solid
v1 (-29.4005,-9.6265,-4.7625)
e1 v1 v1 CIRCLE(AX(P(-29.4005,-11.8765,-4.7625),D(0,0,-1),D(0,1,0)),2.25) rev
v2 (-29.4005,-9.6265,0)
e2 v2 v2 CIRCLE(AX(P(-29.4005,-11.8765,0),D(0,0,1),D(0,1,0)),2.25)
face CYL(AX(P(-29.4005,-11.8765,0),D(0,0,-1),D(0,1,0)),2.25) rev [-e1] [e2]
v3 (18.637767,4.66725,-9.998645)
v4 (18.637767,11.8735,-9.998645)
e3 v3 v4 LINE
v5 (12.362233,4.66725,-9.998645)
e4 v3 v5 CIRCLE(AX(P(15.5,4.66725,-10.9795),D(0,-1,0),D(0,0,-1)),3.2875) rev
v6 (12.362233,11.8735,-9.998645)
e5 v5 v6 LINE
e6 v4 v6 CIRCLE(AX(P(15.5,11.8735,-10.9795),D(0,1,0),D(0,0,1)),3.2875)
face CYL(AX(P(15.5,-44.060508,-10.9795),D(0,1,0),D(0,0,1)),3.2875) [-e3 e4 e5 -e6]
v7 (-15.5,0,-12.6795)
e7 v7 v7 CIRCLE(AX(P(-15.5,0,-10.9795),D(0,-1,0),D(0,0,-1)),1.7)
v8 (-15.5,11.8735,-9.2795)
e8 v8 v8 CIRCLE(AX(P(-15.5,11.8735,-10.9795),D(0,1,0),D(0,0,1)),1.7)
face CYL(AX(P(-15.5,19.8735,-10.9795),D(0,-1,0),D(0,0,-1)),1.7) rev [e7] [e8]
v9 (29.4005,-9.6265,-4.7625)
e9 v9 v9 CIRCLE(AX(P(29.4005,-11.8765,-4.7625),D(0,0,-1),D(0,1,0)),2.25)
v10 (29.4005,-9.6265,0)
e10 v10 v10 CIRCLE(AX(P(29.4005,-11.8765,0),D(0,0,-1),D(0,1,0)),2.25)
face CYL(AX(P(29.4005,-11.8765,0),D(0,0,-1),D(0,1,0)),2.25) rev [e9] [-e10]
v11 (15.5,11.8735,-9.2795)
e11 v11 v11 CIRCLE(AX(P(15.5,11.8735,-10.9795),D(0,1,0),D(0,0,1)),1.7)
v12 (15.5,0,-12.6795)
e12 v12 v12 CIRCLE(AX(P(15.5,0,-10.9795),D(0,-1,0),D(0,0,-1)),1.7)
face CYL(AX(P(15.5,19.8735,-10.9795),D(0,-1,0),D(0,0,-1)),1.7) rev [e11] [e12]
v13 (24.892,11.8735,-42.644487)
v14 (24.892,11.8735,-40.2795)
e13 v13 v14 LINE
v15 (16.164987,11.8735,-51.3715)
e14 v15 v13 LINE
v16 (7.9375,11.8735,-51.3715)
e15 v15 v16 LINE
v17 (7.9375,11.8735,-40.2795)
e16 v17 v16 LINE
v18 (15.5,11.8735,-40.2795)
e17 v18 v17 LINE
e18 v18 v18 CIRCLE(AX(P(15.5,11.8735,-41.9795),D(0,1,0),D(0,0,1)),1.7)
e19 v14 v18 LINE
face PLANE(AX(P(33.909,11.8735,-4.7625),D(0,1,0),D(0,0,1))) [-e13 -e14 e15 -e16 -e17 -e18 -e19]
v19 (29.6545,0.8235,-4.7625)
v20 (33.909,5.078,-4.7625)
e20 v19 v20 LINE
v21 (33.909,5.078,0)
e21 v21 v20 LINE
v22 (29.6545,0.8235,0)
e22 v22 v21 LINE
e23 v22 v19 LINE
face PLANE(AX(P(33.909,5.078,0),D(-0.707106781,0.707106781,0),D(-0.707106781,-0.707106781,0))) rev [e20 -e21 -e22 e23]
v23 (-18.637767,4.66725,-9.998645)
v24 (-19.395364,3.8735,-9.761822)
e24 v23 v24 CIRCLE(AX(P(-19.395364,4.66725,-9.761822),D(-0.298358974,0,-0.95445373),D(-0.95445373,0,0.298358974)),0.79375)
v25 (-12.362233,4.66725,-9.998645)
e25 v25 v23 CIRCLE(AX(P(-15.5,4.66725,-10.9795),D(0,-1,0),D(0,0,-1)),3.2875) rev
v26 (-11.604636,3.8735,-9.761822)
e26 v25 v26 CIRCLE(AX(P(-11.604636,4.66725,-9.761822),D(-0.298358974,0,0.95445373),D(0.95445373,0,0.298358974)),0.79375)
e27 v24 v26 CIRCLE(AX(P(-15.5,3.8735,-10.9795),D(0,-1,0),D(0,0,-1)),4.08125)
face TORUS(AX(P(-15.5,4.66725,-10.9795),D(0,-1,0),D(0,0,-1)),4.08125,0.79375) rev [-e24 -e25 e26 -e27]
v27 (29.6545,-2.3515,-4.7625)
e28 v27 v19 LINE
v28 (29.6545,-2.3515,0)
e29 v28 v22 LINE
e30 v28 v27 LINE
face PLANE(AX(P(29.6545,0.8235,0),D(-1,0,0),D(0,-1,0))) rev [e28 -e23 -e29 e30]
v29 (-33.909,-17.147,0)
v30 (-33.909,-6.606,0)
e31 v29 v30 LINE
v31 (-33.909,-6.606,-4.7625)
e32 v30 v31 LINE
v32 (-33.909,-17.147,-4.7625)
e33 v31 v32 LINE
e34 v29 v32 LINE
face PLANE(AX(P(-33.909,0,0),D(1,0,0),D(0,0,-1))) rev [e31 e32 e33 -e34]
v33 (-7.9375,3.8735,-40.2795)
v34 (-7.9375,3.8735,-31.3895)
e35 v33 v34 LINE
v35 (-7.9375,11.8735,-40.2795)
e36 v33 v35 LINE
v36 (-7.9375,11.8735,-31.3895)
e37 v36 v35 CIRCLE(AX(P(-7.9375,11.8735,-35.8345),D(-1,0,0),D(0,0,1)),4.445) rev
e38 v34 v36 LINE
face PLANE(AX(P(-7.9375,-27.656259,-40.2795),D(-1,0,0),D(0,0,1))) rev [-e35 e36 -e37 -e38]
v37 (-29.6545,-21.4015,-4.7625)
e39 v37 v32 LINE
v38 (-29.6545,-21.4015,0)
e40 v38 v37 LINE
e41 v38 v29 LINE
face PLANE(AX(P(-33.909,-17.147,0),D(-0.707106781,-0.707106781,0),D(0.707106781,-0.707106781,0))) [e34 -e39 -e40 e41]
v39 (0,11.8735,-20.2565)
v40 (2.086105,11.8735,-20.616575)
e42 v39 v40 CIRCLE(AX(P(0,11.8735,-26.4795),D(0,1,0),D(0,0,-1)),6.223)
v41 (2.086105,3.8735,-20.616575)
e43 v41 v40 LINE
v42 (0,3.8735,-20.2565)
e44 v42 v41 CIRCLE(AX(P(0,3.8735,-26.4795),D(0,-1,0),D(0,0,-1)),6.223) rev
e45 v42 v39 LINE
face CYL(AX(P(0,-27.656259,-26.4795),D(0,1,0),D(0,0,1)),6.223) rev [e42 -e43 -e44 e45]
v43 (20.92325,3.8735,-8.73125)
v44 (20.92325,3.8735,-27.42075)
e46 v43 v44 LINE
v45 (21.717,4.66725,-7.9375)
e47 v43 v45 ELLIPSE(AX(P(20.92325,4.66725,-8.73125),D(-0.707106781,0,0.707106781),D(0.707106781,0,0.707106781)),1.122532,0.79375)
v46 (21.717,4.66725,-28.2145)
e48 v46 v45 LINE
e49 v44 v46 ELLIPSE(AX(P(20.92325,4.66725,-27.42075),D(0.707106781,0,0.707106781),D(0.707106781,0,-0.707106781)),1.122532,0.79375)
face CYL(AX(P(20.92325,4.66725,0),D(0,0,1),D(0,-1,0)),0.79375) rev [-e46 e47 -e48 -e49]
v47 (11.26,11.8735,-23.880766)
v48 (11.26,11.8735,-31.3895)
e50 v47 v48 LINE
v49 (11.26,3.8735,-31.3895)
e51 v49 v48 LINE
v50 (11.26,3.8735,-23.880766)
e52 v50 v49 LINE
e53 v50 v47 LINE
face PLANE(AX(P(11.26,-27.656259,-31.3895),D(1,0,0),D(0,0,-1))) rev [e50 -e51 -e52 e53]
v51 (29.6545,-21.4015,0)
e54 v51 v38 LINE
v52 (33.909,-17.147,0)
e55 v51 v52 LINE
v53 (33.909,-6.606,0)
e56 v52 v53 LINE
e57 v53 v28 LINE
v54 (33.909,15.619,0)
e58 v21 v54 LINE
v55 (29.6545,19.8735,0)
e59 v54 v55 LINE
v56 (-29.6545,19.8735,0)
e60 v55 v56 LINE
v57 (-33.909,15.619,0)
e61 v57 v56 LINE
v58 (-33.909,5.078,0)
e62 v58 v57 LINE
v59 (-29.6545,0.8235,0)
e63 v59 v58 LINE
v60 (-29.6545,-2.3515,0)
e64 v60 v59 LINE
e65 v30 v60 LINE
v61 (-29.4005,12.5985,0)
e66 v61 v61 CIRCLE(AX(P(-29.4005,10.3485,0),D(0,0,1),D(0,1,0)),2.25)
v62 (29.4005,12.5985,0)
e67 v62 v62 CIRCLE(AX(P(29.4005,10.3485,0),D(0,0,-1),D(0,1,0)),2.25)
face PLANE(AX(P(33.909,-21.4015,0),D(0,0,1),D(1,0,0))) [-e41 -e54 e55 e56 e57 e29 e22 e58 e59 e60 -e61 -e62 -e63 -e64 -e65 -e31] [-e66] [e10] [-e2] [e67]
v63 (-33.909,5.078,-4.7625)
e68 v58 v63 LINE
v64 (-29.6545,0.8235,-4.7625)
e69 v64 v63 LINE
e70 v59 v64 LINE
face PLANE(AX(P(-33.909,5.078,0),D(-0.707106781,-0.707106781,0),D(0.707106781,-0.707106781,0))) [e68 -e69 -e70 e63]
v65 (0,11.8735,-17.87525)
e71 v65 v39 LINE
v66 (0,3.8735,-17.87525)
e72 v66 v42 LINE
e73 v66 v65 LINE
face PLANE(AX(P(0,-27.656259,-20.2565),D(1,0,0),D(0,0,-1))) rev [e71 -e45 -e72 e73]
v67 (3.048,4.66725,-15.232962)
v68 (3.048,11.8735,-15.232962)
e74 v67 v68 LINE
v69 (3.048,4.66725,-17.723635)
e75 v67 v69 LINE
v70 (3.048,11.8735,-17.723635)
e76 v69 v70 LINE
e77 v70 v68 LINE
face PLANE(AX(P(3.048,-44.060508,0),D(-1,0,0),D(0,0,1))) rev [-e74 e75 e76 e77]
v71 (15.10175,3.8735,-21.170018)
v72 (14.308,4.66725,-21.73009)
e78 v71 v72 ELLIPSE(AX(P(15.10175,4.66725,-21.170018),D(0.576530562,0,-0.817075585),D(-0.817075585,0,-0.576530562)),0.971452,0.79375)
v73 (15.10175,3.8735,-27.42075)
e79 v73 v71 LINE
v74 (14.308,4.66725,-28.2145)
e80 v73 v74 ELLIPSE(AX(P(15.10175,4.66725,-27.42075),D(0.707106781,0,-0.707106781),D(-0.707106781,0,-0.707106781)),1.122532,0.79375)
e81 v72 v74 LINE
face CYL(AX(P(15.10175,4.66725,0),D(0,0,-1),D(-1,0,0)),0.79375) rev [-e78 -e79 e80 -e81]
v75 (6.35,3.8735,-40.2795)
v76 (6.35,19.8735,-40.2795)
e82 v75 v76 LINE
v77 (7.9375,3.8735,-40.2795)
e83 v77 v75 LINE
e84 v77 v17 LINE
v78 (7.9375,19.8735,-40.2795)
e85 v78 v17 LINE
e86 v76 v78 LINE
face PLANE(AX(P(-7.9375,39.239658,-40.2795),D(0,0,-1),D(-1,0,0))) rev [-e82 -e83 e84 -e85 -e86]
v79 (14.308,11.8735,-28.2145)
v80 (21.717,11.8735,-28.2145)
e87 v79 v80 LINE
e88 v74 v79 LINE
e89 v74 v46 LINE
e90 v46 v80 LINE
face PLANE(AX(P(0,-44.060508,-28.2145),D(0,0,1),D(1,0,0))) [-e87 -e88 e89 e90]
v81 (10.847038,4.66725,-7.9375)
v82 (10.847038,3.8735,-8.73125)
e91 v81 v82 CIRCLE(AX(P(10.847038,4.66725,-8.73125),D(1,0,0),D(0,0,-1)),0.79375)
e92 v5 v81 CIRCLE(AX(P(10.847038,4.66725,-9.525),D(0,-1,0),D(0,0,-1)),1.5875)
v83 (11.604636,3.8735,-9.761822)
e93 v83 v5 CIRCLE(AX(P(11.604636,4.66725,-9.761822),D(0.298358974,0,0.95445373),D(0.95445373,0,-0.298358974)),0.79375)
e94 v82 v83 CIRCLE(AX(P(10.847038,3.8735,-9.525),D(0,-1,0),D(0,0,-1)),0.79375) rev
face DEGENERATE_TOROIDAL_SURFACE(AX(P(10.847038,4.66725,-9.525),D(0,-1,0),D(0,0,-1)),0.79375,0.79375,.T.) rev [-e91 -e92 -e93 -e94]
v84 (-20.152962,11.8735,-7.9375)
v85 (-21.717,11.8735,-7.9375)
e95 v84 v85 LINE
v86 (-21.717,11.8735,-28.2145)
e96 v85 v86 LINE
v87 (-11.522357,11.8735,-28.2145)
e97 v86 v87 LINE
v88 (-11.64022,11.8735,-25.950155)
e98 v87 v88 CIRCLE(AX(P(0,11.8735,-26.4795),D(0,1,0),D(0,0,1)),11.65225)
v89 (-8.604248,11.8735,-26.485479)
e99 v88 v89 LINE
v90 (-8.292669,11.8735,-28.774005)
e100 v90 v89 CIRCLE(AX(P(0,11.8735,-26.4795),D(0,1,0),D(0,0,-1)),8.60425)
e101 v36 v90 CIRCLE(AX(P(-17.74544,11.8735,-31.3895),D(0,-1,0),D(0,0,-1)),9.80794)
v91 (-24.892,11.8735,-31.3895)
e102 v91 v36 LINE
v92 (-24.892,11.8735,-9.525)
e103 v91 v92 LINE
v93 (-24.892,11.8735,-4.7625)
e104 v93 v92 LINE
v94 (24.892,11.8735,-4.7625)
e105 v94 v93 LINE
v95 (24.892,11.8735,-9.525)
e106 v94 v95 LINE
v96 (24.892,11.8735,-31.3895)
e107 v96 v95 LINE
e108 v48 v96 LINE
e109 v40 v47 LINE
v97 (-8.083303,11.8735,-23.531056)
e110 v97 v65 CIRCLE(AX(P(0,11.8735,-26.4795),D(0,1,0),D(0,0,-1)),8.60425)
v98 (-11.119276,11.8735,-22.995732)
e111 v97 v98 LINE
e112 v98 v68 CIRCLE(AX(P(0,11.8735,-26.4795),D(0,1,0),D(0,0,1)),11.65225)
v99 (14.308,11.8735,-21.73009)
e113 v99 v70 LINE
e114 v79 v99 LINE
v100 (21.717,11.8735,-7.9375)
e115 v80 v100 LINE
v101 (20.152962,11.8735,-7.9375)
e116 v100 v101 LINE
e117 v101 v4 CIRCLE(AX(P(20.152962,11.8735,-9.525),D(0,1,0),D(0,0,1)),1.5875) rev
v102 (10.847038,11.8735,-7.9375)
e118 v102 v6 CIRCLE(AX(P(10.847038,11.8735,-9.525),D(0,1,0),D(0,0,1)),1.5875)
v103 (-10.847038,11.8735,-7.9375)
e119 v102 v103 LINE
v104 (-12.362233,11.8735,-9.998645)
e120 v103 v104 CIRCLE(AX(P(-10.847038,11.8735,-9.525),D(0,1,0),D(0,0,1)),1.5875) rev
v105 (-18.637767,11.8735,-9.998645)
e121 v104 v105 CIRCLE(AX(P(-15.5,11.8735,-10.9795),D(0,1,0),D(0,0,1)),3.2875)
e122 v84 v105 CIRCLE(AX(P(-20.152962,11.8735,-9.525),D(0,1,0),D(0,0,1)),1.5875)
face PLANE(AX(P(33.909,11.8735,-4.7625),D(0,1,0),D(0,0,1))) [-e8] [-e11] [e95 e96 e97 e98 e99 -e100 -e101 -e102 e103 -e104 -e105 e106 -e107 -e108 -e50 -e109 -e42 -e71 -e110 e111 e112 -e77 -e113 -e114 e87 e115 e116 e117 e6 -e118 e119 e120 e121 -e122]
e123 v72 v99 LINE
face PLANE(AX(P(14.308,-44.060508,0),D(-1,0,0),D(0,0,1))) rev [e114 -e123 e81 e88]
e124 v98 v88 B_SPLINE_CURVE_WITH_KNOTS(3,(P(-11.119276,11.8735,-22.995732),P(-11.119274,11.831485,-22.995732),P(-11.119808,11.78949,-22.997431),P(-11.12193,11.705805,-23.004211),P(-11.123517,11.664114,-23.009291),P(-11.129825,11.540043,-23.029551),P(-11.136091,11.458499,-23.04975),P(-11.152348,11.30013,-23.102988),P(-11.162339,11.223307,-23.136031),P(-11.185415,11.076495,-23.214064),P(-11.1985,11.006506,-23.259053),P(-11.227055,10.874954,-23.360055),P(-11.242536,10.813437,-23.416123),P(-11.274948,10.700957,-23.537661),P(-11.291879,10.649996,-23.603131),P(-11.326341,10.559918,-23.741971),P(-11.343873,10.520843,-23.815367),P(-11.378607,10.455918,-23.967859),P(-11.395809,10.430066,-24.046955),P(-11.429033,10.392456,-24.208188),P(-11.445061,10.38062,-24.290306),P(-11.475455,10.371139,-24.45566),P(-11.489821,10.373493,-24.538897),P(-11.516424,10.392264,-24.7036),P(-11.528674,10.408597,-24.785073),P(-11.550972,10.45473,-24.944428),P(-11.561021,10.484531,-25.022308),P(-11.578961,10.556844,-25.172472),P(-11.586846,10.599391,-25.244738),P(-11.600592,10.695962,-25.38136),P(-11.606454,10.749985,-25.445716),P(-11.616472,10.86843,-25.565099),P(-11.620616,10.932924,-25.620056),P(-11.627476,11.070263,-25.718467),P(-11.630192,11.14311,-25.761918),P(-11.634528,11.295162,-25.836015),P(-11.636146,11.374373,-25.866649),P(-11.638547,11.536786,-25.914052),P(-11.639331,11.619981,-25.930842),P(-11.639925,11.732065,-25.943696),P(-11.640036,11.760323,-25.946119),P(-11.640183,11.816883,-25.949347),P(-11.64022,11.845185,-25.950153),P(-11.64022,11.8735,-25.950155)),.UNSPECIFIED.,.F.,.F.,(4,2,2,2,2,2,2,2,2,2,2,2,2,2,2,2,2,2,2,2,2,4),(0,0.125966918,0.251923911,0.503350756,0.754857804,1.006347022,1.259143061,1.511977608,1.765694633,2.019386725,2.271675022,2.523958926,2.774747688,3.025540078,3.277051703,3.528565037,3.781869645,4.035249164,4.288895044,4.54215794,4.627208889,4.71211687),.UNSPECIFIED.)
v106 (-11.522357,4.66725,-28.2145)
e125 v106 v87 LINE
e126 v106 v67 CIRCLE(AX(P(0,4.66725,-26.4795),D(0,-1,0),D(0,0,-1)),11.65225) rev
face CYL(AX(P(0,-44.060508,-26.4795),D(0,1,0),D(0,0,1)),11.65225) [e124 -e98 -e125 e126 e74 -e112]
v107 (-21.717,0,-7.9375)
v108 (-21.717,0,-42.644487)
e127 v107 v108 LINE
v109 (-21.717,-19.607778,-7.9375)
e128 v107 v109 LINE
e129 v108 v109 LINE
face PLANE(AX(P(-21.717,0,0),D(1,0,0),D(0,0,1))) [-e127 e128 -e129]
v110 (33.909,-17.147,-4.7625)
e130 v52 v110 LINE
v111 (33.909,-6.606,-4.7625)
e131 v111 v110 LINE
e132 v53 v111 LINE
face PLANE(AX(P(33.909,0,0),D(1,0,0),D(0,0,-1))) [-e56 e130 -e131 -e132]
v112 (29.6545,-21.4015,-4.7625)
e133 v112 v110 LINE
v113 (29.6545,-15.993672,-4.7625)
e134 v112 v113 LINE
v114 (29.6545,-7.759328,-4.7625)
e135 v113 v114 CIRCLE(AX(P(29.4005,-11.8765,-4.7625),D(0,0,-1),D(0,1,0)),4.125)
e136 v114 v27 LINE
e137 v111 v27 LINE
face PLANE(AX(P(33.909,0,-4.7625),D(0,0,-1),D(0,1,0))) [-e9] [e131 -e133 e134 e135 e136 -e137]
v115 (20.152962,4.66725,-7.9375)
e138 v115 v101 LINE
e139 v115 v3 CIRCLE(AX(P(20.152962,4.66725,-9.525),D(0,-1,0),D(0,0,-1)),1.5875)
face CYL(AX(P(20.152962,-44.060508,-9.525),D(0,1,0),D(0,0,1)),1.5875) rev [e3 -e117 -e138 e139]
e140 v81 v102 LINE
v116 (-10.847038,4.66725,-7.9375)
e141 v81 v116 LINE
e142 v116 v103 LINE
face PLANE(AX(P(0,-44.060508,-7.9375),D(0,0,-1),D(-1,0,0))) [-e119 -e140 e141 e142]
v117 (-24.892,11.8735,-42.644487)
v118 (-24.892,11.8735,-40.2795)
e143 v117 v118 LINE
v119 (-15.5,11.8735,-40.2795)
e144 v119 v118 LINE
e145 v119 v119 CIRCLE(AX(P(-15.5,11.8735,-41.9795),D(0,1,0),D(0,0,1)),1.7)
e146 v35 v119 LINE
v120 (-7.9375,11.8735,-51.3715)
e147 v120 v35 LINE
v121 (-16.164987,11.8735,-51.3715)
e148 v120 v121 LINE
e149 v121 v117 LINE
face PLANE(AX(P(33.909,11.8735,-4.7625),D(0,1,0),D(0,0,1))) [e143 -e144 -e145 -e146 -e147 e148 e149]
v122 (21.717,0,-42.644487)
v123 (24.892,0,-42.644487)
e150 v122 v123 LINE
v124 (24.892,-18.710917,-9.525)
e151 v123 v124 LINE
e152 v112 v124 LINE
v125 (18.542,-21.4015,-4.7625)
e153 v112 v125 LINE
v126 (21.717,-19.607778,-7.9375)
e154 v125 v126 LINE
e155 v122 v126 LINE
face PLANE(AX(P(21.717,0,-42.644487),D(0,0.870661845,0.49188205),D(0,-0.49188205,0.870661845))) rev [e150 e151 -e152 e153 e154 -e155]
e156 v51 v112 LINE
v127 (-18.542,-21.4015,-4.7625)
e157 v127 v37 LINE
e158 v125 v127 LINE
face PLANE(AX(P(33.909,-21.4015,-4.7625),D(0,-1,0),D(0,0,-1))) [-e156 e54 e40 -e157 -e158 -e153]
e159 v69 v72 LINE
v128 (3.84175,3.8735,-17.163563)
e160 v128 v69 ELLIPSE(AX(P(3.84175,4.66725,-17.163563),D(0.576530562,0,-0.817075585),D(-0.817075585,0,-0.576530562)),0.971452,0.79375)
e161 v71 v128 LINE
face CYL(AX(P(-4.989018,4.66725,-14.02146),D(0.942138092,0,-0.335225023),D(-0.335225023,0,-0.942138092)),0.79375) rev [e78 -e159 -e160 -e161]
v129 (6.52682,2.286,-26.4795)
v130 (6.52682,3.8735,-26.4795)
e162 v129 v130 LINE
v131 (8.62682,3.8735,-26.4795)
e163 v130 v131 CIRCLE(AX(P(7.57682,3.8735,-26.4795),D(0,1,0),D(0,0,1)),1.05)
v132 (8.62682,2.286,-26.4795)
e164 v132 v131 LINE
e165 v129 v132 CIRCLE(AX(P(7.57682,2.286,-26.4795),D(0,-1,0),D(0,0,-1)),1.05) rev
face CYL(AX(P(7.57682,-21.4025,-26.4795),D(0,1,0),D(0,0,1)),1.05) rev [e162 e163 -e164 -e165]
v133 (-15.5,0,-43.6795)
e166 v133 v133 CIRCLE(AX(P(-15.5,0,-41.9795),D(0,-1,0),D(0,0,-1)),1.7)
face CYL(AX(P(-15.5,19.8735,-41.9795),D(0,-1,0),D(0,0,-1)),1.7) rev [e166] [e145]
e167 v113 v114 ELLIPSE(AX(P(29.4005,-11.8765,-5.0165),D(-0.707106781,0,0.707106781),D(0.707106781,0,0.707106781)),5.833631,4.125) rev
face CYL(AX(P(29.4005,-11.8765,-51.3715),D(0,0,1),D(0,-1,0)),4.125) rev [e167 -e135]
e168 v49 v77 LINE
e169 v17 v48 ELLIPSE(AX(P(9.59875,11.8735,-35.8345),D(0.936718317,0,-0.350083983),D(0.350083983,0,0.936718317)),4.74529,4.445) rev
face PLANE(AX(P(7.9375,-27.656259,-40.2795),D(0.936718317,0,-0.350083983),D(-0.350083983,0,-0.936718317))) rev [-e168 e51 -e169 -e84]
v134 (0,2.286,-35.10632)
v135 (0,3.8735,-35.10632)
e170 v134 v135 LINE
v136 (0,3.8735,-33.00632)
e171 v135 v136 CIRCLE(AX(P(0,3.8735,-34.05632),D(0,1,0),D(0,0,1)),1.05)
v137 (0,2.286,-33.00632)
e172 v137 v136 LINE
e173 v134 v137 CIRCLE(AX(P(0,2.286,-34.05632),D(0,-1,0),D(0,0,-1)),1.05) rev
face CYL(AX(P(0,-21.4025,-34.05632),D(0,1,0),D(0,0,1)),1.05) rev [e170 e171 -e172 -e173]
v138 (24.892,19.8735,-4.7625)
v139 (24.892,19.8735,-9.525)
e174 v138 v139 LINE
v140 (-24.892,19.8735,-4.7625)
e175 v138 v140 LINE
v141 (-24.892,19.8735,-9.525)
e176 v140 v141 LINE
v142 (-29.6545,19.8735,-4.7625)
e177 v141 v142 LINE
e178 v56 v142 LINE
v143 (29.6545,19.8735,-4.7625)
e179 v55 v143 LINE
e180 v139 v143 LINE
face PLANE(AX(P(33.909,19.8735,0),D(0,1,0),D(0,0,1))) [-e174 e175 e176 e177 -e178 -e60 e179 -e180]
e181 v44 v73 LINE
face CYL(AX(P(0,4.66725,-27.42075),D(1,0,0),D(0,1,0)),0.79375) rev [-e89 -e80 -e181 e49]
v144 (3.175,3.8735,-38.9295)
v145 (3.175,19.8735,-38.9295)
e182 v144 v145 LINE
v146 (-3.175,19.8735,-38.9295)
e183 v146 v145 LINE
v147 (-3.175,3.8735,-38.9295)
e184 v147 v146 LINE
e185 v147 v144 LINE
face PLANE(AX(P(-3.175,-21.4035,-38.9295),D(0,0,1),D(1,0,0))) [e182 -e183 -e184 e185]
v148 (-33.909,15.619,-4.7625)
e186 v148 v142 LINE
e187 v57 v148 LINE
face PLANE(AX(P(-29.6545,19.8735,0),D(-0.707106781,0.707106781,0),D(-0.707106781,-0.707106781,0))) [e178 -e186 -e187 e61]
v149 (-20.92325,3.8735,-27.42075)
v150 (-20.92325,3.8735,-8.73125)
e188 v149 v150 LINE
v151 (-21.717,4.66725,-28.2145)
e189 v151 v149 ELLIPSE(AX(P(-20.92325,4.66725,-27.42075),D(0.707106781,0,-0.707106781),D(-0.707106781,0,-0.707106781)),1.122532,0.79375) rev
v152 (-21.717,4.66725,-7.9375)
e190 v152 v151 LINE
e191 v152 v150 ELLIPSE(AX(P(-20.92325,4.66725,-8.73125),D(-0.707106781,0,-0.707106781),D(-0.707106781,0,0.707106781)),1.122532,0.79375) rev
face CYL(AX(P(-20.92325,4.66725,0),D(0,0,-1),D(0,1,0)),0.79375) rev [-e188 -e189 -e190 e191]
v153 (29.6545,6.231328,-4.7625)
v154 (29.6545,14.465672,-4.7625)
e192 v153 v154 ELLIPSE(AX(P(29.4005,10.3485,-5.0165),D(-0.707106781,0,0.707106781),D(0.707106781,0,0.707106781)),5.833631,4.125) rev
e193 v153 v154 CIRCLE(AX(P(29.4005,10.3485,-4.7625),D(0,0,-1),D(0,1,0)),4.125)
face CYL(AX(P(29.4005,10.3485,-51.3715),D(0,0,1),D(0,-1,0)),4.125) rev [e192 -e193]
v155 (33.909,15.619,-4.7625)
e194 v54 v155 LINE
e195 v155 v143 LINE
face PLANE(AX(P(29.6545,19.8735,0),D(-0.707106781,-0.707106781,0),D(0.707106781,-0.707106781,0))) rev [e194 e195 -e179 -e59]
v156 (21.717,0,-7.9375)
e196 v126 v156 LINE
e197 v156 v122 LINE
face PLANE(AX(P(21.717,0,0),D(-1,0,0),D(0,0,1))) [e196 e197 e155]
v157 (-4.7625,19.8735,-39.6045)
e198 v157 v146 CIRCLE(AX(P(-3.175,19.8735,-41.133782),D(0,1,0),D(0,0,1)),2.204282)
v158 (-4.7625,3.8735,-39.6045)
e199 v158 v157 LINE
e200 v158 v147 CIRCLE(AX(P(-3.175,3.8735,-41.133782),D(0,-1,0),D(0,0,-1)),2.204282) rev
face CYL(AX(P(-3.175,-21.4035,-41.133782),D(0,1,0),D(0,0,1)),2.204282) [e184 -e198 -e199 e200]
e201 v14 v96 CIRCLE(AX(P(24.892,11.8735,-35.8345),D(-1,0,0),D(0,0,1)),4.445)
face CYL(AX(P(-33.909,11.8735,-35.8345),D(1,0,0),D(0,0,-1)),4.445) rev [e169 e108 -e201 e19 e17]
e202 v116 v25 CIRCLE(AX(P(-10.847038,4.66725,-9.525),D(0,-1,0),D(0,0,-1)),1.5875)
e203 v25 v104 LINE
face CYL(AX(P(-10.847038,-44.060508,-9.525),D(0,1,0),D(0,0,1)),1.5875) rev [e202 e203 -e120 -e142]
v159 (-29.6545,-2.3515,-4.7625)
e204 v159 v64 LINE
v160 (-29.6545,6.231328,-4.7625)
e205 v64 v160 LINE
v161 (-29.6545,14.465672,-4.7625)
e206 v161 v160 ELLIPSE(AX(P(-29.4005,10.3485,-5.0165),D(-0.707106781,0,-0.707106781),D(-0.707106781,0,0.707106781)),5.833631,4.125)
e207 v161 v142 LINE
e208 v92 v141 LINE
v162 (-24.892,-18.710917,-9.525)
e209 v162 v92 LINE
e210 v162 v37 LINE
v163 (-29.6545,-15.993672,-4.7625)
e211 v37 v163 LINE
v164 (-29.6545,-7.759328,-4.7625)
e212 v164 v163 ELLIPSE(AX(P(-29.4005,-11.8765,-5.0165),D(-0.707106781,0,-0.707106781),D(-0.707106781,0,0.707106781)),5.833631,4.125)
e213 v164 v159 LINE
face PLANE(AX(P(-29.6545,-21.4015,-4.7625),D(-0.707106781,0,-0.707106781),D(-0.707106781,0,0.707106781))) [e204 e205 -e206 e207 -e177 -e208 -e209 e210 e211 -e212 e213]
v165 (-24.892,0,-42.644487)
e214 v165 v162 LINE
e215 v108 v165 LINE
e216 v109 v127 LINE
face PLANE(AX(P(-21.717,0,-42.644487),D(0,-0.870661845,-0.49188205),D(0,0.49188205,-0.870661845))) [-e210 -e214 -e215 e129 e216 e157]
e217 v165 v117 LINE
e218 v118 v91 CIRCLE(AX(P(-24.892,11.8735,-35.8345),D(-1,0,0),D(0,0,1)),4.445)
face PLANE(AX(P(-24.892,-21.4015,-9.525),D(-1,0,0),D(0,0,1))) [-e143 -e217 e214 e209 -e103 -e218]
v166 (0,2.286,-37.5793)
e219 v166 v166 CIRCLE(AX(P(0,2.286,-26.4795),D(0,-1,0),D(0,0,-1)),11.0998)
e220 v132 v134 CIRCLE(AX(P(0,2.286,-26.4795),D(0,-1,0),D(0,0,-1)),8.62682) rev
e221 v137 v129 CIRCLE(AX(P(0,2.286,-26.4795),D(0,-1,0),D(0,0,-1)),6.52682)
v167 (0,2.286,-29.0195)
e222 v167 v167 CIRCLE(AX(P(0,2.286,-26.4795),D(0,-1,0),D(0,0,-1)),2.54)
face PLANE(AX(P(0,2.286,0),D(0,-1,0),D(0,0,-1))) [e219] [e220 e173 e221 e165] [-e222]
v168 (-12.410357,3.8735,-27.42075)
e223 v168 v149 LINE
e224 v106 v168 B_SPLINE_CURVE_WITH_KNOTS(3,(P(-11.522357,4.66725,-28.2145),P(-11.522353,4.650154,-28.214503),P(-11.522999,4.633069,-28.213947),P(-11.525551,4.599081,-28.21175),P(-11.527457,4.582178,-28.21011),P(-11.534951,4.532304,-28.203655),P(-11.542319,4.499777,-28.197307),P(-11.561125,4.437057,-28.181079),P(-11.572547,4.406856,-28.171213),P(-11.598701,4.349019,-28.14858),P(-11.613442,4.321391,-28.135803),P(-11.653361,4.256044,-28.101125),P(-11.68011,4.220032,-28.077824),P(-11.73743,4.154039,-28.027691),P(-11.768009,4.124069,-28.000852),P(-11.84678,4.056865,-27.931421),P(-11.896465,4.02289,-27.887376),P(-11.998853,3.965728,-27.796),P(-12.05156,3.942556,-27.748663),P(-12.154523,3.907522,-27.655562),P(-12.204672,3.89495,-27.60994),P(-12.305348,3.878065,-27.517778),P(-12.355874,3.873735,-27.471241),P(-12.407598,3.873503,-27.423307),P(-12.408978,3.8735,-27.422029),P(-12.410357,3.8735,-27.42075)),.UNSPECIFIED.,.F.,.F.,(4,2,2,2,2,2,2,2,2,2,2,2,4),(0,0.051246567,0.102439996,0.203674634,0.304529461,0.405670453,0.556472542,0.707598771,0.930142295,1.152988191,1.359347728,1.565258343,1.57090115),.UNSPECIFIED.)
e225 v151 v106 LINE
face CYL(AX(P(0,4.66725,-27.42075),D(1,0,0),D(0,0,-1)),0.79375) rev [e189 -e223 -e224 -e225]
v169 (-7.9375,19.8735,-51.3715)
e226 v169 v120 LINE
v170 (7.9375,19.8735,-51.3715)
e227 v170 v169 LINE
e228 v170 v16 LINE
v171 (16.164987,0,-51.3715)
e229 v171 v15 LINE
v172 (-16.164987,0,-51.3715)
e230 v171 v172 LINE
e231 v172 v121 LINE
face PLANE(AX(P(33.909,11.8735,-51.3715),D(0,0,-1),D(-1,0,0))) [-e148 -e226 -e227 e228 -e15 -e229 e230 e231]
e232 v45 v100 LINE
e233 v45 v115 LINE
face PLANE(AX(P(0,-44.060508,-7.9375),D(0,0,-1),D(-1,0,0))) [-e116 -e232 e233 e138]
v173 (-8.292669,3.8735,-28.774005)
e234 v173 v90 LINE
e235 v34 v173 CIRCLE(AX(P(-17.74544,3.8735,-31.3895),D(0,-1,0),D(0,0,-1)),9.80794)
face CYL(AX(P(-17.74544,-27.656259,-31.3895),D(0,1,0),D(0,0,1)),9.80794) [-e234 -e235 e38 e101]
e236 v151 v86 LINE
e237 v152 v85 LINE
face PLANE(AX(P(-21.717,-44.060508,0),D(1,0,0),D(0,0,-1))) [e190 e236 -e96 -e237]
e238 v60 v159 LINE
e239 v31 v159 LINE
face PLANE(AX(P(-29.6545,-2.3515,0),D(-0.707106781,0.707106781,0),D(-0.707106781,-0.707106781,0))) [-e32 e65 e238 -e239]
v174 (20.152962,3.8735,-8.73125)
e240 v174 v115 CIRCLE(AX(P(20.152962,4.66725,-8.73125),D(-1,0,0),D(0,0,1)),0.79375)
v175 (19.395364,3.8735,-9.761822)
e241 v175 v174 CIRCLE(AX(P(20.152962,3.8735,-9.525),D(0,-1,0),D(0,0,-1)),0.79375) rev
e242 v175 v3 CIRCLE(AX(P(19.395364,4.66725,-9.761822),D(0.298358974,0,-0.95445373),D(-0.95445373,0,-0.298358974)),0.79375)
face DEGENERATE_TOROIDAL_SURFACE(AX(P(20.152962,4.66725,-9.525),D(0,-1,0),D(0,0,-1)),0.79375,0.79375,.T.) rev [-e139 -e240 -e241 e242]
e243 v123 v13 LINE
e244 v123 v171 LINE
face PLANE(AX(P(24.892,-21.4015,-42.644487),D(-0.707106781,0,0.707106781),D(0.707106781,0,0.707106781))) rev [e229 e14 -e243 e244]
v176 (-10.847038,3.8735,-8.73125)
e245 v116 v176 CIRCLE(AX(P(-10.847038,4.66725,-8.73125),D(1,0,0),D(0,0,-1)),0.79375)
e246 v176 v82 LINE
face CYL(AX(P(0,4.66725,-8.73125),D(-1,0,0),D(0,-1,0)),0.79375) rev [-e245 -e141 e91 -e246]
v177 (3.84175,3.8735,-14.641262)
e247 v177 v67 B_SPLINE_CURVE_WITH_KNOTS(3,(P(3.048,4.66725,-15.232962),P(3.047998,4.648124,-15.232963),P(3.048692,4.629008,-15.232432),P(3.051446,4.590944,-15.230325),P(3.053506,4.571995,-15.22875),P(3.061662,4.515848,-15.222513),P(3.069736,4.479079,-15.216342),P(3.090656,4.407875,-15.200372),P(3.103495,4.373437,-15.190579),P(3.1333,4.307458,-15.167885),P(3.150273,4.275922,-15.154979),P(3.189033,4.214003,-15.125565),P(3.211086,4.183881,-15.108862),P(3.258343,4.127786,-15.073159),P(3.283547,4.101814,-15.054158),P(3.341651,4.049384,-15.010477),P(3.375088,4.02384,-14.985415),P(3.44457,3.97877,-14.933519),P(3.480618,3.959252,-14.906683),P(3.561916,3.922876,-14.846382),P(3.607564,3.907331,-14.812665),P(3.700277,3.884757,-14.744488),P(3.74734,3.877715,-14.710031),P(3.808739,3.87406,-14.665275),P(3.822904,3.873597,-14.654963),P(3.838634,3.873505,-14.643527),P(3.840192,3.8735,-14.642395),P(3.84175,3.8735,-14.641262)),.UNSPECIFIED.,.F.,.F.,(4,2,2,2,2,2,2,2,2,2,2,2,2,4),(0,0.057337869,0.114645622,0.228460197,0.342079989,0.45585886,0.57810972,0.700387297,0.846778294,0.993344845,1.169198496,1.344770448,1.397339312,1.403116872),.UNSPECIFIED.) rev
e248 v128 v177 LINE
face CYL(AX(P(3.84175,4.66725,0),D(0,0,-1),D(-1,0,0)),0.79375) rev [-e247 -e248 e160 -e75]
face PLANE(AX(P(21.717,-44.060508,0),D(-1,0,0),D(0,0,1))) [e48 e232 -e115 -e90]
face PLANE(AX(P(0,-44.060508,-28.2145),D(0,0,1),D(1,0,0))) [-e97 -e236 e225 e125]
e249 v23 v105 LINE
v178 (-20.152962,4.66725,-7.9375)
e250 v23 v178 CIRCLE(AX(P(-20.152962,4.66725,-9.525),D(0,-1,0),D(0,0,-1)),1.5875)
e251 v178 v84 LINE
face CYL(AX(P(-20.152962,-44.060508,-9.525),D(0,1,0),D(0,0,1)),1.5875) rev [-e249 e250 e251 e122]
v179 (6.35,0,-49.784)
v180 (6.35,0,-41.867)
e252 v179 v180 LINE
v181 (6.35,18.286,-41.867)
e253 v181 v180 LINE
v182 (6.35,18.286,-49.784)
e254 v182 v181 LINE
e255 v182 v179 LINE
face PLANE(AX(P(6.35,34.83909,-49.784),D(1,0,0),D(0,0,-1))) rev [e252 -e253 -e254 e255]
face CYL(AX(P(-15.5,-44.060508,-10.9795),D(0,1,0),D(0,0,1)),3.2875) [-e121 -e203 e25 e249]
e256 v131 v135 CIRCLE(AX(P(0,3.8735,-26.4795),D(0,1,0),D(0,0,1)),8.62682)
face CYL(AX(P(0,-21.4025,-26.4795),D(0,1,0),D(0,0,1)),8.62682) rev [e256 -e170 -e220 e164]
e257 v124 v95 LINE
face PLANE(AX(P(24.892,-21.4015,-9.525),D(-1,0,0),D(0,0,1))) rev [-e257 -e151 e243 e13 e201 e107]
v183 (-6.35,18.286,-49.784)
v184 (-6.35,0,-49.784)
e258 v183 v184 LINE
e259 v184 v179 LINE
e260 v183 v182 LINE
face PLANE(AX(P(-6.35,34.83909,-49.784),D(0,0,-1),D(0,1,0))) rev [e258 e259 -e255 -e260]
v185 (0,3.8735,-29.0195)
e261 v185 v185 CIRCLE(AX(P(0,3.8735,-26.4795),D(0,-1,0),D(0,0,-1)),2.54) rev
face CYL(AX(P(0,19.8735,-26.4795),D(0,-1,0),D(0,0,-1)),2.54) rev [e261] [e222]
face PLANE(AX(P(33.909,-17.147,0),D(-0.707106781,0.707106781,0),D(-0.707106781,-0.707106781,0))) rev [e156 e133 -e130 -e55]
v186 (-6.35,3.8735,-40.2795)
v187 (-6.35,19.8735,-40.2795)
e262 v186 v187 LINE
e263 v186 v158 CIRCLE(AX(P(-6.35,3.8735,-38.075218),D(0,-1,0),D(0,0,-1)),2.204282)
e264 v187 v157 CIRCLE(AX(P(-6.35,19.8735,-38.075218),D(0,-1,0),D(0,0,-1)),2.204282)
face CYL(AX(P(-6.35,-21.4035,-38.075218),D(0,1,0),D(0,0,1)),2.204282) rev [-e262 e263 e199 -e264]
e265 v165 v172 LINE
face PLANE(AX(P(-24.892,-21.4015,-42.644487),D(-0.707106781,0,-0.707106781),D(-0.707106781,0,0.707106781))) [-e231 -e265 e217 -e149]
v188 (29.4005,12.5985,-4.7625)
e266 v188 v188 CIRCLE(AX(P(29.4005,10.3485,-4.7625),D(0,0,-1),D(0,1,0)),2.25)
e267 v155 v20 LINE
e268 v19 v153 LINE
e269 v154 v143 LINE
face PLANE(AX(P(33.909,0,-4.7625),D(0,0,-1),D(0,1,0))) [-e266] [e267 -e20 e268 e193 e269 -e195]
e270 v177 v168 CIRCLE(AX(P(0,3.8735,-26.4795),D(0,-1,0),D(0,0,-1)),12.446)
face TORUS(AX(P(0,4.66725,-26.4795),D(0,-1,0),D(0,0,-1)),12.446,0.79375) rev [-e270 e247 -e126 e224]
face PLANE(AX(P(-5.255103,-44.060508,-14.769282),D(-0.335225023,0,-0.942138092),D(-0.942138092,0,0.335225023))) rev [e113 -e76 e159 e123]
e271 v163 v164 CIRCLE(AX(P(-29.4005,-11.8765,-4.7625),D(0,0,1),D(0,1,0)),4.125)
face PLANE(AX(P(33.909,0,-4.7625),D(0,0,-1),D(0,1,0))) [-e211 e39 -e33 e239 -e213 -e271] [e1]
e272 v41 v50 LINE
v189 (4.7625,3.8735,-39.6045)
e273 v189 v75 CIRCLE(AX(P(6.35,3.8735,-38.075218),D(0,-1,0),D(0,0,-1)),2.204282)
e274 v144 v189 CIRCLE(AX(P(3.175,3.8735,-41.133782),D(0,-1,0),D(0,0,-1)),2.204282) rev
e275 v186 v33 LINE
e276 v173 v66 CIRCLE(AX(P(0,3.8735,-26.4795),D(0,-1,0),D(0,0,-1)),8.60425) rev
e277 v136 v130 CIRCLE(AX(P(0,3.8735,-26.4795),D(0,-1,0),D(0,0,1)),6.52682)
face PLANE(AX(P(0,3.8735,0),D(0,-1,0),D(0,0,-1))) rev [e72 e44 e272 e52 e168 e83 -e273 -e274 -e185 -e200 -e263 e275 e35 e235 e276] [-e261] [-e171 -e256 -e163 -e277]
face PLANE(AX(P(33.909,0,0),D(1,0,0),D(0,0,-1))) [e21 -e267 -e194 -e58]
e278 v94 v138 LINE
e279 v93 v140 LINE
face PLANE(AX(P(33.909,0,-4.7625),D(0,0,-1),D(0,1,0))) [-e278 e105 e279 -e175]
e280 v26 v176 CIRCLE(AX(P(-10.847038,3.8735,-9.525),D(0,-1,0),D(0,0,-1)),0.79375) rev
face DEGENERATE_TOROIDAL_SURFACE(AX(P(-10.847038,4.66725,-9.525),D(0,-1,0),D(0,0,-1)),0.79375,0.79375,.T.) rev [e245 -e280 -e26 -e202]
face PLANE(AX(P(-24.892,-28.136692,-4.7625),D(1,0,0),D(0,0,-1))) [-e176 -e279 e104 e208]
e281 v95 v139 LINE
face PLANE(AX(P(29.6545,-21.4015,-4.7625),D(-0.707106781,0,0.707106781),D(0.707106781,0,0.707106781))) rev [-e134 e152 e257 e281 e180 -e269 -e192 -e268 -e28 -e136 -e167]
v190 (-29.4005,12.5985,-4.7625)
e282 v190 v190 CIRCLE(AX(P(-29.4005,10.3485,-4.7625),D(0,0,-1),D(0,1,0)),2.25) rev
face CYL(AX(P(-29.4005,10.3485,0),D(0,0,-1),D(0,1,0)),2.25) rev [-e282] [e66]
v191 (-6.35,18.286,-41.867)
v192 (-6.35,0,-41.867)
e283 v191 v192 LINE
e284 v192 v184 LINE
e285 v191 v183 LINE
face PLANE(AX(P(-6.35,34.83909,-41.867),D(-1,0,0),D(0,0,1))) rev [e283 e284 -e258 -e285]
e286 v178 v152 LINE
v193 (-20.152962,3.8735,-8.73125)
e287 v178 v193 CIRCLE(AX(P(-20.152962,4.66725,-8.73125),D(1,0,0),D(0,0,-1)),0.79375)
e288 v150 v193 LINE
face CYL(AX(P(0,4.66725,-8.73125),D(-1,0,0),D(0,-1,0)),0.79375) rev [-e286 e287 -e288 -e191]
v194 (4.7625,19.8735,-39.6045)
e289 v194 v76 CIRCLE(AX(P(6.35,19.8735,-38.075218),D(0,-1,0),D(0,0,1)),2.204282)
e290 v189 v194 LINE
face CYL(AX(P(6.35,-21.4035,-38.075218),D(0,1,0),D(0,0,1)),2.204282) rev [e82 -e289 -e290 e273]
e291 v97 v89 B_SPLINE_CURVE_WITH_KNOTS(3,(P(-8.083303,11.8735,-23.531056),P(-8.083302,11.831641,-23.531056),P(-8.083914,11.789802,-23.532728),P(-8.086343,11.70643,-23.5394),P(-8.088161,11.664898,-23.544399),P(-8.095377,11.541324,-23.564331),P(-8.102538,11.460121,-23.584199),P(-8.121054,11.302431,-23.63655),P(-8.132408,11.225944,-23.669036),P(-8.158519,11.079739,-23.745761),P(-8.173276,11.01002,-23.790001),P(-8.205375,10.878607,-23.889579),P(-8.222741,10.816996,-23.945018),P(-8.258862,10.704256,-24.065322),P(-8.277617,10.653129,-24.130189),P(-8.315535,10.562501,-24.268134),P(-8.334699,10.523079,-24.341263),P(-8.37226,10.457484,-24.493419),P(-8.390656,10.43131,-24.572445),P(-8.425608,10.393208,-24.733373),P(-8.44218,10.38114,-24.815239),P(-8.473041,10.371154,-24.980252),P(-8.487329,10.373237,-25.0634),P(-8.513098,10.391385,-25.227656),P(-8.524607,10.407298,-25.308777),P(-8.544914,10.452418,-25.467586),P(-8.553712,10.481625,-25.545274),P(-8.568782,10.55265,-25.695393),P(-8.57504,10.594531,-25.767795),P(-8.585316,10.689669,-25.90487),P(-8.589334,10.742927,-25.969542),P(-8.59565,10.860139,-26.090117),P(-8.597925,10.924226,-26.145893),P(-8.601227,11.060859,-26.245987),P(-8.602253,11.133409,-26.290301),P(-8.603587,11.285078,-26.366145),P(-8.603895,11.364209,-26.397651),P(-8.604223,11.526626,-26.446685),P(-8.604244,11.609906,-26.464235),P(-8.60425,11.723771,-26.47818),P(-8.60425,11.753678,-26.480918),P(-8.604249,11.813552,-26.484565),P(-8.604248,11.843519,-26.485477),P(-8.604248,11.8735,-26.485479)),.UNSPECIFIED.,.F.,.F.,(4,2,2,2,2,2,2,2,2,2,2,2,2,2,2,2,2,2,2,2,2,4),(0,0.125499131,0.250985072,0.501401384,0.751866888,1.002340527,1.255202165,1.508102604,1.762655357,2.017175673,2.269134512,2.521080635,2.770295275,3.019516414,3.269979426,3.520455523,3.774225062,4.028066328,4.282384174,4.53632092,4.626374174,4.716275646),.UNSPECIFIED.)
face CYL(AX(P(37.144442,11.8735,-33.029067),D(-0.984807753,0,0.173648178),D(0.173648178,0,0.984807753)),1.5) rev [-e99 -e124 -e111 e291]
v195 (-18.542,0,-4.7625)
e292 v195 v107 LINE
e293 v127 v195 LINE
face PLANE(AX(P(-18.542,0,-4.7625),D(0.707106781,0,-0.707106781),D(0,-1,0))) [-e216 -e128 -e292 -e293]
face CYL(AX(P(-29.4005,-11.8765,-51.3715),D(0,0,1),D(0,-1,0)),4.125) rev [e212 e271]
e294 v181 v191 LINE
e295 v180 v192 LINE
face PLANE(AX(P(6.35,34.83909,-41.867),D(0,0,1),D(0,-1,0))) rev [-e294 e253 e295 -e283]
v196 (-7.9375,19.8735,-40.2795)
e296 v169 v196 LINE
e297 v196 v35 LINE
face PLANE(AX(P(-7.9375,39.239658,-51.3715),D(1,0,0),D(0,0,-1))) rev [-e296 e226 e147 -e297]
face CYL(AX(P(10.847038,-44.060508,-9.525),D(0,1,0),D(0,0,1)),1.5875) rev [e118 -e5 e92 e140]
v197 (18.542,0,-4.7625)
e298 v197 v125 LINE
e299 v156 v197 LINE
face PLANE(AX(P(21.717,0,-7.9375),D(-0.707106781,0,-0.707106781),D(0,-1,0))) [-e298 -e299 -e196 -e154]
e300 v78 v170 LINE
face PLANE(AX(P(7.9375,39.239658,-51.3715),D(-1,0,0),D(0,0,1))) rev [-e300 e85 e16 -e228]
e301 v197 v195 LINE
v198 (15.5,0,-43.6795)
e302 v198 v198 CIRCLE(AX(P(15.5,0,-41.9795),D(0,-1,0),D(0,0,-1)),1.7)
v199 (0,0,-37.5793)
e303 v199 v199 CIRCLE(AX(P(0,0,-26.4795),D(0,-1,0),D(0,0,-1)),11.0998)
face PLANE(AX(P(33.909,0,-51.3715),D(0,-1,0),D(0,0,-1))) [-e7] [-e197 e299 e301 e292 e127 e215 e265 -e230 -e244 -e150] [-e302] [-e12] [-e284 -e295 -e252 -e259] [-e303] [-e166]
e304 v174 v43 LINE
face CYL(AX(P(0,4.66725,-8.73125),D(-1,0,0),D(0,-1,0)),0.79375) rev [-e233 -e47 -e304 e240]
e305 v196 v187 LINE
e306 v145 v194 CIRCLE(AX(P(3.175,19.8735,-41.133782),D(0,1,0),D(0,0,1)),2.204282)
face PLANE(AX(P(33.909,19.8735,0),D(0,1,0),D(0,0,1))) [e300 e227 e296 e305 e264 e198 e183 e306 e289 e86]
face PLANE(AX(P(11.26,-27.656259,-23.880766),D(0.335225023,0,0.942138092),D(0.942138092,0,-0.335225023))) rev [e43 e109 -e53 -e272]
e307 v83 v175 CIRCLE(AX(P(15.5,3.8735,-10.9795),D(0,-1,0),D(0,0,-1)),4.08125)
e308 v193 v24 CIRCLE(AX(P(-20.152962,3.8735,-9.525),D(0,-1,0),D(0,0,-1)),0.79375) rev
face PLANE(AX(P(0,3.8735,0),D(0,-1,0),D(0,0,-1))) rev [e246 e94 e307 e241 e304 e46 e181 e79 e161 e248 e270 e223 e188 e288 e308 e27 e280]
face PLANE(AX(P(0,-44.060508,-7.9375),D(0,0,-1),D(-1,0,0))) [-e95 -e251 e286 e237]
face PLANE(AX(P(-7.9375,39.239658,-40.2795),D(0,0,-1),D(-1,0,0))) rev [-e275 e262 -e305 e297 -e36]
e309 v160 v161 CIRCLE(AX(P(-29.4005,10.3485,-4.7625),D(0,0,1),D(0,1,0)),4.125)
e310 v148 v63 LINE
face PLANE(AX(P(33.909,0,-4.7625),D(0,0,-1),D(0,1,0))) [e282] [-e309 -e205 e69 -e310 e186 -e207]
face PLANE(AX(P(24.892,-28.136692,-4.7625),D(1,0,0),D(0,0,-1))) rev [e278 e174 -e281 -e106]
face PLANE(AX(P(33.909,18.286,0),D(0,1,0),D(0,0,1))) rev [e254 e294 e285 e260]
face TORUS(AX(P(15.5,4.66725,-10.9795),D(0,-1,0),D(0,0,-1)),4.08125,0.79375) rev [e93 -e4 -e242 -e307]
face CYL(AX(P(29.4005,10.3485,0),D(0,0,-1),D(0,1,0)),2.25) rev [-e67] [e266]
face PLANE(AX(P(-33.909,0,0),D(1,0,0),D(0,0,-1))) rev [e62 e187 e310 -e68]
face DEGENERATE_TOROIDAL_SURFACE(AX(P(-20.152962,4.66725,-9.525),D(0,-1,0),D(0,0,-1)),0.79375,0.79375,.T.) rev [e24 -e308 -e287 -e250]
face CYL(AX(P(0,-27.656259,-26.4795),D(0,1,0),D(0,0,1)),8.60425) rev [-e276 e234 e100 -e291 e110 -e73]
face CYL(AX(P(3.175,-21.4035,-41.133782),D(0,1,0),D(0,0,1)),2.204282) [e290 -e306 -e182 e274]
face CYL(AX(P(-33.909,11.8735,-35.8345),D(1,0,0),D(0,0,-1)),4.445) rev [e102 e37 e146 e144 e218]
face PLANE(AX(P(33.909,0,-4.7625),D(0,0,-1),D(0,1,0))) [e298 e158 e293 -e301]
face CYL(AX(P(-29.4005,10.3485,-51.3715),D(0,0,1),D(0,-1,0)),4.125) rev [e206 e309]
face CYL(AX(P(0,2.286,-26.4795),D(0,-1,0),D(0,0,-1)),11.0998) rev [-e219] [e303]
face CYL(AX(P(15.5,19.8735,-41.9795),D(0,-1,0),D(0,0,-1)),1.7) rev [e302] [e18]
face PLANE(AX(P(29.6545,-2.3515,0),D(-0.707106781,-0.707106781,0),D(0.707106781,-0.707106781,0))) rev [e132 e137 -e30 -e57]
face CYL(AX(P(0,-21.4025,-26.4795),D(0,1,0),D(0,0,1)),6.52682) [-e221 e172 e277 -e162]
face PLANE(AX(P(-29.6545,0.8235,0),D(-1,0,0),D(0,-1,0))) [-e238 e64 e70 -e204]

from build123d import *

# Parameters (mm, degrees)
BOSS_EXTRUDE1_DEPTH             = 33.909
CUT_EXTRUDE1_DEPTH              = 70.971972376
BOSS_EXTRUDE2_REACH             = 67.168
BOSS_EXTRUDE2_DIRECTION_2_REACH = 67.168
SKETCH3_R                       = 2.25
CUT_EXTRUDE2_DEPTH              = 62.483683724
SKETCH5_R                       = 4.125
CUT_EXTRUDE3_DEPTH              = 62.483683724
BOSS_EXTRUDE3_DEPTH             = 3.175
CHAMFER1_SIZE                   = 3.175
CUT_EXTRUDE4_DEPTH              = 81.960563335
CUT_EXTRUDE5_DEPTH              = 66.16805579
CUT_EXTRUDE5_DEPTH_BACK         = 66.16805579
SKETCH8_R                       = 2.54
SKETCH8_R_2                     = 1.7
SKETCH8_3_R                     = 11.0998
SKETCH8_3_R_2                   = 2.54
CUT_EXTRUDE6_DEPTH              = 2.286
CUT_EXTRUDE7_DEPTH              = 81.960563335
CUT_EXTRUDE7_DEPTH_BACK         = 81.960563335
SKETCH9_R                       = 4.445
SKETCH10_W                      = 15.875
SKETCH10_H                      = 11.092
BOSS_EXTRUDE4_DEPTH             = 8
CUT_EXTRUDE8_DEPTH              = 8
SKETCH12_W                      = 12.7
SKETCH12_H                      = 7.917
CUT_EXTRUDE9_DEPTH              = 18.286
CUT_EXTRUDE10_DEPTH             = 8
FILLET1_R                       = 0.79375
CUT_EXTRUDE11_REACH             = 71.954
CUT_EXTRUDE11_END_RADIUS        = 8.60425
SKETCH15_R                      = 1.5
CUT_EXTRUDE12_REACH             = 68.541
BOSS_EXTRUDE6_REACH             = 76.111


# Read off the part's stored shape, not the designer's step: Mirror1
with BuildPart() as part:
    # Sketch1 → Boss-Extrude1 (new, symmetric)
    with BuildSketch(Plane(origin=(0, 0, 0), x_dir=(0, 0, -1), z_dir=(1, 0, 0))):
        Polygon((0, -21.4015), (0, 19.8735), (4.7625, 19.8735), (4.7625, 11.8735), (51.3715, 11.8735), (51.3715, 0), (4.7625, 0), (4.7625, -21.4015), align=None)
    extrude(amount=BOSS_EXTRUDE1_DEPTH, both=True)

    # Sketch2 → Cut-Extrude1 (cut, symmetric)
    with BuildSketch(Plane(origin=(0, 11.8735, 0), x_dir=(1, 0, 0), z_dir=(0, 1, 0))):
        Polygon((33.909, 4.7625), (29.6545, 4.7625), (24.892, 9.525), (24.892, 42.644487102), (16.164987102, 51.3715), (23.7109, 51.3715), (33.909, 51.3715), align=None)
    extrude(amount=CUT_EXTRUDE1_DEPTH, both=True, mode=Mode.SUBTRACT)

    # Boss-Extrude2: up to this face of the body (flat: up to its plane)
    boss_extrude2_end = Plane(part.part.faces().sort_by_distance((0, -21.4015, -2.38125))[0])
    # Sketch4 → Boss-Extrude2 (add, up to the picked face)
    with BuildSketch(Plane.XZ, mode=Mode.PRIVATE) as boss_extrude2_sk1:
        Polygon((24.892, -9.525), (29.6545, -4.7625), (24.892, -4.7625), align=None)
    boss_extrude2_tool1 = split(extrude(boss_extrude2_sk1.sketch, amount=BOSS_EXTRUDE2_REACH, mode=Mode.PRIVATE), bisect_by=boss_extrude2_end, keep=Keep.BOTH, mode=Mode.PRIVATE)
    add(boss_extrude2_tool1.solids().sort_by(Axis((26.4795, 0, -6.35), (0, -1, 0)))[0])

    # Boss-Extrude2 direction 2: up to this face of the body (flat: up to its plane)
    boss_extrude2_direction_2_end = Plane(part.part.faces().sort_by_distance((0, 19.8735, -2.38125))[0])
    # Sketch4 → Boss-Extrude2 direction 2 (add, up to the picked face)
    with BuildSketch(Plane.XZ, mode=Mode.PRIVATE) as boss_extrude2_direction_2_sk1:
        Polygon((24.892, -9.525), (29.6545, -4.7625), (24.892, -4.7625), align=None)
    boss_extrude2_direction_2_tool1 = split(extrude(boss_extrude2_direction_2_sk1.sketch, amount=-BOSS_EXTRUDE2_DIRECTION_2_REACH, mode=Mode.PRIVATE), bisect_by=boss_extrude2_direction_2_end, keep=Keep.BOTH, mode=Mode.PRIVATE)
    add(boss_extrude2_direction_2_tool1.solids().sort_by(Axis((26.4795, 0, -6.35), (0, 1, 0)))[0])

    # Sketch3 → Cut-Extrude2 (cut, symmetric)
    with BuildSketch(Plane(origin=(0, 0, -4.7625), x_dir=(-1, 0, 0), z_dir=(0, 0, -1))):
        with Locations(Location((-29.4005, 10.3485, 0), (0, 0, 90))):
            Circle(SKETCH3_R)
        with Locations(Location((-29.4005, -11.8765, 0), (0, 0, 90))):
            Circle(SKETCH3_R)
        Polygon((-29.6545, 19.8735), (-33.909, 15.619), (-33.909, 19.8735), align=None)
        Polygon((-33.909, 5.078), (-29.6545, 0.8235), (-29.6545, -2.3515), (-33.909, -6.606), align=None)
        Polygon((-33.909, -17.147), (-29.6545, -21.4015), (-33.909, -21.4015), align=None)
    extrude(amount=CUT_EXTRUDE2_DEPTH, both=True, mode=Mode.SUBTRACT)

    # Sketch5 → Cut-Extrude3 (cut, through all)
    with BuildSketch(Plane(origin=(0, 0, -4.7625), x_dir=(-1, 0, 0), z_dir=(0, 0, -1))):
        with Locations((-29.4005, 10.3485)):
            Circle(SKETCH5_R)
        with Locations((-29.4005, -11.8765)):
            Circle(SKETCH5_R)
    extrude(amount=CUT_EXTRUDE3_DEPTH, mode=Mode.SUBTRACT)

    # Sketch6 → Boss-Extrude3 (add)
    with BuildSketch(Plane.ZY.offset(-24.892)):
        Polygon((-4.7625, -21.4015), (-4.7625, 0), (-42.644487102, 0), align=None)
    extrude(amount=BOSS_EXTRUDE3_DEPTH)

    # Chamfer1
    chamfer1_edges = [part.edges().sort_by_distance(p)[0] for p in [
        (21.717, -10.70075, -4.7625),
    ]]
    chamfer(chamfer1_edges, length=CHAMFER1_SIZE)

    # Sketch7 → Cut-Extrude4 (cut, symmetric)
    with BuildSketch(Plane(origin=(24.892, 0, 0), x_dir=(0, 0, -1), z_dir=(1, 0, 0))):
        Polygon((9.525, -18.71091665), (4.7625, -21.4015), (9.525, -21.4015), align=None)
    extrude(amount=CUT_EXTRUDE4_DEPTH, both=True, mode=Mode.SUBTRACT)

    # Mirror1
    split(bisect_by=Plane(origin=(0, 0, 0), x_dir=(0, 0, 1), z_dir=(1, 0, 0)), keep=Keep.TOP)

    # Mirror1 2: part across plane


with BuildPart() as part_1:
    add(part.part)
    add(part.part.mirror(Plane(origin=(0, 0, 0), x_dir=(0, 0, 1), z_dir=(1, 0, 0))))

    # Sketch8 → Cut-Extrude5 (cut, two sides: drawn at the far end of the back side and taken through both)
    with BuildSketch(Plane.XZ.offset(-CUT_EXTRUDE5_DEPTH_BACK)):
        with Locations(Location((0, -26.4795, 0), (0, 0, 270))):
            Circle(SKETCH8_R)
        with Locations(Location((15.5, -10.9795, 0), (0, 0, 270))):
            Circle(SKETCH8_R_2)
        with Locations(Location((15.5, -41.9795, 0), (0, 0, 270))):
            Circle(SKETCH8_R_2)
        with Locations(Location((-15.5, -41.9795, 0), (0, 0, 270))):
            Circle(SKETCH8_R_2)
        with Locations(Location((-15.5, -10.9795, 0), (0, 0, 270))):
            Circle(SKETCH8_R_2)
    extrude(amount=CUT_EXTRUDE5_DEPTH + CUT_EXTRUDE5_DEPTH_BACK, mode=Mode.SUBTRACT)

    # Sketch8<3> → Cut-Extrude6 (cut)
    with BuildSketch(Plane.XZ):
        with Locations(Location((0, -26.4795, 0), (0, 0, 270))):
            Circle(SKETCH8_3_R)
        with Locations(Location((0, -26.4795, 0), (0, 0, 270))):
            Circle(SKETCH8_3_R_2, mode=Mode.SUBTRACT)
    extrude(amount=-CUT_EXTRUDE6_DEPTH, mode=Mode.SUBTRACT)

    # Sketch9 → Cut-Extrude7 (cut, two sides: drawn at the far end of the back side and taken through both)
    with BuildSketch(Plane(origin=(24.892, 0, 0), x_dir=(0, 0, -1), z_dir=(1, 0, 0)).offset(-CUT_EXTRUDE7_DEPTH_BACK)):
        with Locations((35.8345, 11.8735)):
            Circle(SKETCH9_R)
    extrude(amount=CUT_EXTRUDE7_DEPTH + CUT_EXTRUDE7_DEPTH_BACK, mode=Mode.SUBTRACT)

    # Sketch10 → Boss-Extrude4 (add)
    with BuildSketch(Plane(origin=(0, 11.8735, 0), x_dir=(1, 0, 0), z_dir=(0, 1, 0))):
        with Locations((0, 45.8255)):
            Rectangle(SKETCH10_W, SKETCH10_H)
    extrude(amount=BOSS_EXTRUDE4_DEPTH)

    # Sketch11 → Cut-Extrude8 (cut)
    with BuildSketch(Plane(origin=(0, 11.8735, 0), x_dir=(1, 0, 0), z_dir=(0, 1, 0))):
        with BuildLine():
            Line((-7.9375, 40.2795), (7.9375, 40.2795))
            Line((7.9375, 40.2795), (11.26, 31.3895))
            Line((11.26, 31.3895), (11.26, 23.880766055))
            Line((11.26, 23.880766055), (2.086105319, 20.616574655))
            ThreePointArc((2.086105319, 20.616574655), (1.0584764, 20.347179337), (0, 20.2565))
            Line((0, 20.2565), (0, 17.87525))
            ThreePointArc((0, 17.87525), (-6.847467237, 21.26938383), (-8.292669268, 28.774005279))
            ThreePointArc((-8.292669268, 28.774005279), (-8.02669792, 30.069750228), (-7.9375, 31.3895))
            Line((-7.9375, 31.3895), (-7.9375, 40.2795))
        make_face()
    extrude(amount=-CUT_EXTRUDE8_DEPTH, mode=Mode.SUBTRACT)

    # Sketch12 → Cut-Extrude9 (cut)
    with BuildSketch(Plane.XZ):
        with Locations((0, -45.8255)):
            Rectangle(SKETCH12_W, SKETCH12_H)
    extrude(amount=-CUT_EXTRUDE9_DEPTH, mode=Mode.SUBTRACT)

    # Sketch13 → Cut-Extrude10 (cut)
    with BuildSketch(Plane(origin=(0, 11.8735, 0), x_dir=(1, 0, 0), z_dir=(0, 1, 0))):
        with BuildLine():
            Line((14.308, 21.730089687), (3.048, 17.723634801))
            Line((3.048, 17.723634801), (3.048, 15.232961596))
            ThreePointArc((3.048, 15.232961596), (-7.751371841, 17.779433066), (-11.522356749, 28.2145))
            Line((-11.522356749, 28.2145), (-21.717, 28.2145))
            Line((-21.717, 28.2145), (-21.717, 9.525))
            Line((-21.717, 9.525), (-21.717, 7.9375))
            Line((-21.717, 7.9375), (-20.152961933, 7.9375))
            ThreePointArc((-20.152961933, 7.9375), (-18.873886587, 8.584722111), (-18.637766637, 9.998644872))
            ThreePointArc((-18.637766637, 9.998644872), (-15.996109076, 14.229351079), (-12.2125, 10.9795))
            ThreePointArc((-12.2125, 10.9795), (-12.250148921, 10.483390924), (-12.362233363, 9.998644872))
            ThreePointArc((-12.362233363, 9.998644872), (-12.126113413, 8.584722111), (-10.847038067, 7.9375))
            Line((-10.847038067, 7.9375), (10.847038067, 7.9375))
            ThreePointArc((10.847038067, 7.9375), (12.126113413, 8.584722111), (12.362233363, 9.998644872))
            ThreePointArc((12.362233363, 9.998644872), (15.003890924, 14.229351079), (18.7875, 10.9795))
            ThreePointArc((18.7875, 10.9795), (18.749851079, 10.483390924), (18.637766637, 9.998644872))
            ThreePointArc((18.637766637, 9.998644872), (18.873886587, 8.584722111), (20.152961933, 7.9375))
            Line((20.152961933, 7.9375), (21.717, 7.9375))
            Line((21.717, 7.9375), (21.717, 9.525))
            Line((21.717, 9.525), (21.717, 28.2145))
            Line((21.717, 28.2145), (14.308, 28.2145))
            Line((14.308, 28.2145), (14.308, 21.730089687))
        make_face()
    extrude(amount=-CUT_EXTRUDE10_DEPTH, mode=Mode.SUBTRACT)

    # Fillet1
    fillet1_edges = [part_1.edges().sort_by_distance(p)[0] for p in [
        (3.048, 3.8735, -16.478298199),
        (8.678, 3.8735, -19.726862244),
        (14.308, 3.8735, -24.972294843),
        (12.126113413, 3.8735, -8.584722111),
        (-18.873886587, 3.8735, -8.584722111),
        (-16.619678375, 3.8735, -28.2145),
        (-7.751371841, 3.8735, -17.779433066),
        (18.0125, 3.8735, -28.2145),
        (21.717, 3.8735, -18.076),
        (20.934980967, 3.8735, -7.9375),
        (18.873886587, 3.8735, -8.584722111),
        (15.003890924, 3.8735, -14.229351079),
        (0, 3.8735, -7.9375),
        (-12.126113413, 3.8735, -8.584722111),
        (-15.996109076, 3.8735, -14.229351079),
        (-20.934980967, 3.8735, -7.9375),
        (-21.717, 3.8735, -18.076),
    ]]
    fillet(fillet1_edges, radius=FILLET1_R - 0.0001)  # a hair under: the kernel refuses the full size

    # Cut-Extrude11: up to this cylinder (the profile starts outside it)
    cut_extrude11_end = Plane(origin=(0, 11.8735, -26.4795), z_dir=(0, 1, 0)) * Cylinder(CUT_EXTRUDE11_END_RADIUS, 162.1165, mode=Mode.PRIVATE)
    # Sketch15 → Cut-Extrude11 (cut, up to the surface)
    with BuildSketch(Plane(origin=(-6.946964947, 0, 1.224937354), x_dir=(0, 1, 0), z_dir=(-0.9848077530122085, 0, 0.17364817766692803)), mode=Mode.PRIVATE) as cut_extrude11_sk1:
        with Locations((11.8735, 26.077216896)):
            Circle(SKETCH15_R)
    cut_extrude11_tool1 = extrude(cut_extrude11_sk1.sketch, amount=-CUT_EXTRUDE11_REACH, mode=Mode.PRIVATE) - cut_extrude11_end
    add(cut_extrude11_tool1.solids().sort_by_distance((-11.475226, 11.8735, -24.456108))[0], mode=Mode.SUBTRACT)

    # Sketch16 → Cut-Extrude12 (cut, up to next)
    with BuildSketch(Plane(origin=(0, 3.8735, 0), x_dir=(1, 0, 0), z_dir=(0, 1, 0)), mode=Mode.PRIVATE) as cut_extrude12_sk1:
        with BuildLine():
            ThreePointArc((8.62682, 26.4795), (6.100082922, 32.579582922), (0, 35.10632))
            ThreePointArc((0, 35.10632), (-1.05, 34.05632), (0, 33.00632))
            ThreePointArc((0, 33.00632), (4.615158682, 31.094658682), (6.52682, 26.4795))
            ThreePointArc((6.52682, 26.4795), (7.57682, 25.4295), (8.62682, 26.4795))
        make_face()
    cut_extrude12_tool1 = extrude(cut_extrude12_sk1.sketch, amount=-CUT_EXTRUDE12_REACH, mode=Mode.PRIVATE) & part_1.part
    add(cut_extrude12_tool1.solids().sort_by_distance((4.697563, 3.8735, -31.177063))[0], mode=Mode.SUBTRACT)

    # Sketch17 → Boss-Extrude6 (add, up to next)
    with BuildSketch(Plane(origin=(0, 19.8735, 0), x_dir=(1, 0, 0), z_dir=(0, 1, 0)), mode=Mode.PRIVATE) as boss_extrude6_sk1:
        with BuildLine():
            Line((-6.35, 40.2795), (6.35, 40.2795))
            ThreePointArc((6.35, 40.2795), (5.487477355, 40.103743072), (4.7625, 39.6045))
            ThreePointArc((4.7625, 39.6045), (4.037522645, 39.105256928), (3.175, 38.9295))
            Line((3.175, 38.9295), (-3.175, 38.9295))
            ThreePointArc((-3.175, 38.9295), (-4.037522645, 39.105256928), (-4.7625, 39.6045))
            ThreePointArc((-4.7625, 39.6045), (-5.487477355, 40.103743072), (-6.35, 40.2795))
        make_face()
    boss_extrude6_tool1 = extrude(boss_extrude6_sk1.sketch, amount=-BOSS_EXTRUDE6_REACH, mode=Mode.PRIVATE) - part_1.part
    add(boss_extrude6_tool1.solids().sort_by_distance((0, 19.8735, -39.653988))[0])


solid = part_1.part
